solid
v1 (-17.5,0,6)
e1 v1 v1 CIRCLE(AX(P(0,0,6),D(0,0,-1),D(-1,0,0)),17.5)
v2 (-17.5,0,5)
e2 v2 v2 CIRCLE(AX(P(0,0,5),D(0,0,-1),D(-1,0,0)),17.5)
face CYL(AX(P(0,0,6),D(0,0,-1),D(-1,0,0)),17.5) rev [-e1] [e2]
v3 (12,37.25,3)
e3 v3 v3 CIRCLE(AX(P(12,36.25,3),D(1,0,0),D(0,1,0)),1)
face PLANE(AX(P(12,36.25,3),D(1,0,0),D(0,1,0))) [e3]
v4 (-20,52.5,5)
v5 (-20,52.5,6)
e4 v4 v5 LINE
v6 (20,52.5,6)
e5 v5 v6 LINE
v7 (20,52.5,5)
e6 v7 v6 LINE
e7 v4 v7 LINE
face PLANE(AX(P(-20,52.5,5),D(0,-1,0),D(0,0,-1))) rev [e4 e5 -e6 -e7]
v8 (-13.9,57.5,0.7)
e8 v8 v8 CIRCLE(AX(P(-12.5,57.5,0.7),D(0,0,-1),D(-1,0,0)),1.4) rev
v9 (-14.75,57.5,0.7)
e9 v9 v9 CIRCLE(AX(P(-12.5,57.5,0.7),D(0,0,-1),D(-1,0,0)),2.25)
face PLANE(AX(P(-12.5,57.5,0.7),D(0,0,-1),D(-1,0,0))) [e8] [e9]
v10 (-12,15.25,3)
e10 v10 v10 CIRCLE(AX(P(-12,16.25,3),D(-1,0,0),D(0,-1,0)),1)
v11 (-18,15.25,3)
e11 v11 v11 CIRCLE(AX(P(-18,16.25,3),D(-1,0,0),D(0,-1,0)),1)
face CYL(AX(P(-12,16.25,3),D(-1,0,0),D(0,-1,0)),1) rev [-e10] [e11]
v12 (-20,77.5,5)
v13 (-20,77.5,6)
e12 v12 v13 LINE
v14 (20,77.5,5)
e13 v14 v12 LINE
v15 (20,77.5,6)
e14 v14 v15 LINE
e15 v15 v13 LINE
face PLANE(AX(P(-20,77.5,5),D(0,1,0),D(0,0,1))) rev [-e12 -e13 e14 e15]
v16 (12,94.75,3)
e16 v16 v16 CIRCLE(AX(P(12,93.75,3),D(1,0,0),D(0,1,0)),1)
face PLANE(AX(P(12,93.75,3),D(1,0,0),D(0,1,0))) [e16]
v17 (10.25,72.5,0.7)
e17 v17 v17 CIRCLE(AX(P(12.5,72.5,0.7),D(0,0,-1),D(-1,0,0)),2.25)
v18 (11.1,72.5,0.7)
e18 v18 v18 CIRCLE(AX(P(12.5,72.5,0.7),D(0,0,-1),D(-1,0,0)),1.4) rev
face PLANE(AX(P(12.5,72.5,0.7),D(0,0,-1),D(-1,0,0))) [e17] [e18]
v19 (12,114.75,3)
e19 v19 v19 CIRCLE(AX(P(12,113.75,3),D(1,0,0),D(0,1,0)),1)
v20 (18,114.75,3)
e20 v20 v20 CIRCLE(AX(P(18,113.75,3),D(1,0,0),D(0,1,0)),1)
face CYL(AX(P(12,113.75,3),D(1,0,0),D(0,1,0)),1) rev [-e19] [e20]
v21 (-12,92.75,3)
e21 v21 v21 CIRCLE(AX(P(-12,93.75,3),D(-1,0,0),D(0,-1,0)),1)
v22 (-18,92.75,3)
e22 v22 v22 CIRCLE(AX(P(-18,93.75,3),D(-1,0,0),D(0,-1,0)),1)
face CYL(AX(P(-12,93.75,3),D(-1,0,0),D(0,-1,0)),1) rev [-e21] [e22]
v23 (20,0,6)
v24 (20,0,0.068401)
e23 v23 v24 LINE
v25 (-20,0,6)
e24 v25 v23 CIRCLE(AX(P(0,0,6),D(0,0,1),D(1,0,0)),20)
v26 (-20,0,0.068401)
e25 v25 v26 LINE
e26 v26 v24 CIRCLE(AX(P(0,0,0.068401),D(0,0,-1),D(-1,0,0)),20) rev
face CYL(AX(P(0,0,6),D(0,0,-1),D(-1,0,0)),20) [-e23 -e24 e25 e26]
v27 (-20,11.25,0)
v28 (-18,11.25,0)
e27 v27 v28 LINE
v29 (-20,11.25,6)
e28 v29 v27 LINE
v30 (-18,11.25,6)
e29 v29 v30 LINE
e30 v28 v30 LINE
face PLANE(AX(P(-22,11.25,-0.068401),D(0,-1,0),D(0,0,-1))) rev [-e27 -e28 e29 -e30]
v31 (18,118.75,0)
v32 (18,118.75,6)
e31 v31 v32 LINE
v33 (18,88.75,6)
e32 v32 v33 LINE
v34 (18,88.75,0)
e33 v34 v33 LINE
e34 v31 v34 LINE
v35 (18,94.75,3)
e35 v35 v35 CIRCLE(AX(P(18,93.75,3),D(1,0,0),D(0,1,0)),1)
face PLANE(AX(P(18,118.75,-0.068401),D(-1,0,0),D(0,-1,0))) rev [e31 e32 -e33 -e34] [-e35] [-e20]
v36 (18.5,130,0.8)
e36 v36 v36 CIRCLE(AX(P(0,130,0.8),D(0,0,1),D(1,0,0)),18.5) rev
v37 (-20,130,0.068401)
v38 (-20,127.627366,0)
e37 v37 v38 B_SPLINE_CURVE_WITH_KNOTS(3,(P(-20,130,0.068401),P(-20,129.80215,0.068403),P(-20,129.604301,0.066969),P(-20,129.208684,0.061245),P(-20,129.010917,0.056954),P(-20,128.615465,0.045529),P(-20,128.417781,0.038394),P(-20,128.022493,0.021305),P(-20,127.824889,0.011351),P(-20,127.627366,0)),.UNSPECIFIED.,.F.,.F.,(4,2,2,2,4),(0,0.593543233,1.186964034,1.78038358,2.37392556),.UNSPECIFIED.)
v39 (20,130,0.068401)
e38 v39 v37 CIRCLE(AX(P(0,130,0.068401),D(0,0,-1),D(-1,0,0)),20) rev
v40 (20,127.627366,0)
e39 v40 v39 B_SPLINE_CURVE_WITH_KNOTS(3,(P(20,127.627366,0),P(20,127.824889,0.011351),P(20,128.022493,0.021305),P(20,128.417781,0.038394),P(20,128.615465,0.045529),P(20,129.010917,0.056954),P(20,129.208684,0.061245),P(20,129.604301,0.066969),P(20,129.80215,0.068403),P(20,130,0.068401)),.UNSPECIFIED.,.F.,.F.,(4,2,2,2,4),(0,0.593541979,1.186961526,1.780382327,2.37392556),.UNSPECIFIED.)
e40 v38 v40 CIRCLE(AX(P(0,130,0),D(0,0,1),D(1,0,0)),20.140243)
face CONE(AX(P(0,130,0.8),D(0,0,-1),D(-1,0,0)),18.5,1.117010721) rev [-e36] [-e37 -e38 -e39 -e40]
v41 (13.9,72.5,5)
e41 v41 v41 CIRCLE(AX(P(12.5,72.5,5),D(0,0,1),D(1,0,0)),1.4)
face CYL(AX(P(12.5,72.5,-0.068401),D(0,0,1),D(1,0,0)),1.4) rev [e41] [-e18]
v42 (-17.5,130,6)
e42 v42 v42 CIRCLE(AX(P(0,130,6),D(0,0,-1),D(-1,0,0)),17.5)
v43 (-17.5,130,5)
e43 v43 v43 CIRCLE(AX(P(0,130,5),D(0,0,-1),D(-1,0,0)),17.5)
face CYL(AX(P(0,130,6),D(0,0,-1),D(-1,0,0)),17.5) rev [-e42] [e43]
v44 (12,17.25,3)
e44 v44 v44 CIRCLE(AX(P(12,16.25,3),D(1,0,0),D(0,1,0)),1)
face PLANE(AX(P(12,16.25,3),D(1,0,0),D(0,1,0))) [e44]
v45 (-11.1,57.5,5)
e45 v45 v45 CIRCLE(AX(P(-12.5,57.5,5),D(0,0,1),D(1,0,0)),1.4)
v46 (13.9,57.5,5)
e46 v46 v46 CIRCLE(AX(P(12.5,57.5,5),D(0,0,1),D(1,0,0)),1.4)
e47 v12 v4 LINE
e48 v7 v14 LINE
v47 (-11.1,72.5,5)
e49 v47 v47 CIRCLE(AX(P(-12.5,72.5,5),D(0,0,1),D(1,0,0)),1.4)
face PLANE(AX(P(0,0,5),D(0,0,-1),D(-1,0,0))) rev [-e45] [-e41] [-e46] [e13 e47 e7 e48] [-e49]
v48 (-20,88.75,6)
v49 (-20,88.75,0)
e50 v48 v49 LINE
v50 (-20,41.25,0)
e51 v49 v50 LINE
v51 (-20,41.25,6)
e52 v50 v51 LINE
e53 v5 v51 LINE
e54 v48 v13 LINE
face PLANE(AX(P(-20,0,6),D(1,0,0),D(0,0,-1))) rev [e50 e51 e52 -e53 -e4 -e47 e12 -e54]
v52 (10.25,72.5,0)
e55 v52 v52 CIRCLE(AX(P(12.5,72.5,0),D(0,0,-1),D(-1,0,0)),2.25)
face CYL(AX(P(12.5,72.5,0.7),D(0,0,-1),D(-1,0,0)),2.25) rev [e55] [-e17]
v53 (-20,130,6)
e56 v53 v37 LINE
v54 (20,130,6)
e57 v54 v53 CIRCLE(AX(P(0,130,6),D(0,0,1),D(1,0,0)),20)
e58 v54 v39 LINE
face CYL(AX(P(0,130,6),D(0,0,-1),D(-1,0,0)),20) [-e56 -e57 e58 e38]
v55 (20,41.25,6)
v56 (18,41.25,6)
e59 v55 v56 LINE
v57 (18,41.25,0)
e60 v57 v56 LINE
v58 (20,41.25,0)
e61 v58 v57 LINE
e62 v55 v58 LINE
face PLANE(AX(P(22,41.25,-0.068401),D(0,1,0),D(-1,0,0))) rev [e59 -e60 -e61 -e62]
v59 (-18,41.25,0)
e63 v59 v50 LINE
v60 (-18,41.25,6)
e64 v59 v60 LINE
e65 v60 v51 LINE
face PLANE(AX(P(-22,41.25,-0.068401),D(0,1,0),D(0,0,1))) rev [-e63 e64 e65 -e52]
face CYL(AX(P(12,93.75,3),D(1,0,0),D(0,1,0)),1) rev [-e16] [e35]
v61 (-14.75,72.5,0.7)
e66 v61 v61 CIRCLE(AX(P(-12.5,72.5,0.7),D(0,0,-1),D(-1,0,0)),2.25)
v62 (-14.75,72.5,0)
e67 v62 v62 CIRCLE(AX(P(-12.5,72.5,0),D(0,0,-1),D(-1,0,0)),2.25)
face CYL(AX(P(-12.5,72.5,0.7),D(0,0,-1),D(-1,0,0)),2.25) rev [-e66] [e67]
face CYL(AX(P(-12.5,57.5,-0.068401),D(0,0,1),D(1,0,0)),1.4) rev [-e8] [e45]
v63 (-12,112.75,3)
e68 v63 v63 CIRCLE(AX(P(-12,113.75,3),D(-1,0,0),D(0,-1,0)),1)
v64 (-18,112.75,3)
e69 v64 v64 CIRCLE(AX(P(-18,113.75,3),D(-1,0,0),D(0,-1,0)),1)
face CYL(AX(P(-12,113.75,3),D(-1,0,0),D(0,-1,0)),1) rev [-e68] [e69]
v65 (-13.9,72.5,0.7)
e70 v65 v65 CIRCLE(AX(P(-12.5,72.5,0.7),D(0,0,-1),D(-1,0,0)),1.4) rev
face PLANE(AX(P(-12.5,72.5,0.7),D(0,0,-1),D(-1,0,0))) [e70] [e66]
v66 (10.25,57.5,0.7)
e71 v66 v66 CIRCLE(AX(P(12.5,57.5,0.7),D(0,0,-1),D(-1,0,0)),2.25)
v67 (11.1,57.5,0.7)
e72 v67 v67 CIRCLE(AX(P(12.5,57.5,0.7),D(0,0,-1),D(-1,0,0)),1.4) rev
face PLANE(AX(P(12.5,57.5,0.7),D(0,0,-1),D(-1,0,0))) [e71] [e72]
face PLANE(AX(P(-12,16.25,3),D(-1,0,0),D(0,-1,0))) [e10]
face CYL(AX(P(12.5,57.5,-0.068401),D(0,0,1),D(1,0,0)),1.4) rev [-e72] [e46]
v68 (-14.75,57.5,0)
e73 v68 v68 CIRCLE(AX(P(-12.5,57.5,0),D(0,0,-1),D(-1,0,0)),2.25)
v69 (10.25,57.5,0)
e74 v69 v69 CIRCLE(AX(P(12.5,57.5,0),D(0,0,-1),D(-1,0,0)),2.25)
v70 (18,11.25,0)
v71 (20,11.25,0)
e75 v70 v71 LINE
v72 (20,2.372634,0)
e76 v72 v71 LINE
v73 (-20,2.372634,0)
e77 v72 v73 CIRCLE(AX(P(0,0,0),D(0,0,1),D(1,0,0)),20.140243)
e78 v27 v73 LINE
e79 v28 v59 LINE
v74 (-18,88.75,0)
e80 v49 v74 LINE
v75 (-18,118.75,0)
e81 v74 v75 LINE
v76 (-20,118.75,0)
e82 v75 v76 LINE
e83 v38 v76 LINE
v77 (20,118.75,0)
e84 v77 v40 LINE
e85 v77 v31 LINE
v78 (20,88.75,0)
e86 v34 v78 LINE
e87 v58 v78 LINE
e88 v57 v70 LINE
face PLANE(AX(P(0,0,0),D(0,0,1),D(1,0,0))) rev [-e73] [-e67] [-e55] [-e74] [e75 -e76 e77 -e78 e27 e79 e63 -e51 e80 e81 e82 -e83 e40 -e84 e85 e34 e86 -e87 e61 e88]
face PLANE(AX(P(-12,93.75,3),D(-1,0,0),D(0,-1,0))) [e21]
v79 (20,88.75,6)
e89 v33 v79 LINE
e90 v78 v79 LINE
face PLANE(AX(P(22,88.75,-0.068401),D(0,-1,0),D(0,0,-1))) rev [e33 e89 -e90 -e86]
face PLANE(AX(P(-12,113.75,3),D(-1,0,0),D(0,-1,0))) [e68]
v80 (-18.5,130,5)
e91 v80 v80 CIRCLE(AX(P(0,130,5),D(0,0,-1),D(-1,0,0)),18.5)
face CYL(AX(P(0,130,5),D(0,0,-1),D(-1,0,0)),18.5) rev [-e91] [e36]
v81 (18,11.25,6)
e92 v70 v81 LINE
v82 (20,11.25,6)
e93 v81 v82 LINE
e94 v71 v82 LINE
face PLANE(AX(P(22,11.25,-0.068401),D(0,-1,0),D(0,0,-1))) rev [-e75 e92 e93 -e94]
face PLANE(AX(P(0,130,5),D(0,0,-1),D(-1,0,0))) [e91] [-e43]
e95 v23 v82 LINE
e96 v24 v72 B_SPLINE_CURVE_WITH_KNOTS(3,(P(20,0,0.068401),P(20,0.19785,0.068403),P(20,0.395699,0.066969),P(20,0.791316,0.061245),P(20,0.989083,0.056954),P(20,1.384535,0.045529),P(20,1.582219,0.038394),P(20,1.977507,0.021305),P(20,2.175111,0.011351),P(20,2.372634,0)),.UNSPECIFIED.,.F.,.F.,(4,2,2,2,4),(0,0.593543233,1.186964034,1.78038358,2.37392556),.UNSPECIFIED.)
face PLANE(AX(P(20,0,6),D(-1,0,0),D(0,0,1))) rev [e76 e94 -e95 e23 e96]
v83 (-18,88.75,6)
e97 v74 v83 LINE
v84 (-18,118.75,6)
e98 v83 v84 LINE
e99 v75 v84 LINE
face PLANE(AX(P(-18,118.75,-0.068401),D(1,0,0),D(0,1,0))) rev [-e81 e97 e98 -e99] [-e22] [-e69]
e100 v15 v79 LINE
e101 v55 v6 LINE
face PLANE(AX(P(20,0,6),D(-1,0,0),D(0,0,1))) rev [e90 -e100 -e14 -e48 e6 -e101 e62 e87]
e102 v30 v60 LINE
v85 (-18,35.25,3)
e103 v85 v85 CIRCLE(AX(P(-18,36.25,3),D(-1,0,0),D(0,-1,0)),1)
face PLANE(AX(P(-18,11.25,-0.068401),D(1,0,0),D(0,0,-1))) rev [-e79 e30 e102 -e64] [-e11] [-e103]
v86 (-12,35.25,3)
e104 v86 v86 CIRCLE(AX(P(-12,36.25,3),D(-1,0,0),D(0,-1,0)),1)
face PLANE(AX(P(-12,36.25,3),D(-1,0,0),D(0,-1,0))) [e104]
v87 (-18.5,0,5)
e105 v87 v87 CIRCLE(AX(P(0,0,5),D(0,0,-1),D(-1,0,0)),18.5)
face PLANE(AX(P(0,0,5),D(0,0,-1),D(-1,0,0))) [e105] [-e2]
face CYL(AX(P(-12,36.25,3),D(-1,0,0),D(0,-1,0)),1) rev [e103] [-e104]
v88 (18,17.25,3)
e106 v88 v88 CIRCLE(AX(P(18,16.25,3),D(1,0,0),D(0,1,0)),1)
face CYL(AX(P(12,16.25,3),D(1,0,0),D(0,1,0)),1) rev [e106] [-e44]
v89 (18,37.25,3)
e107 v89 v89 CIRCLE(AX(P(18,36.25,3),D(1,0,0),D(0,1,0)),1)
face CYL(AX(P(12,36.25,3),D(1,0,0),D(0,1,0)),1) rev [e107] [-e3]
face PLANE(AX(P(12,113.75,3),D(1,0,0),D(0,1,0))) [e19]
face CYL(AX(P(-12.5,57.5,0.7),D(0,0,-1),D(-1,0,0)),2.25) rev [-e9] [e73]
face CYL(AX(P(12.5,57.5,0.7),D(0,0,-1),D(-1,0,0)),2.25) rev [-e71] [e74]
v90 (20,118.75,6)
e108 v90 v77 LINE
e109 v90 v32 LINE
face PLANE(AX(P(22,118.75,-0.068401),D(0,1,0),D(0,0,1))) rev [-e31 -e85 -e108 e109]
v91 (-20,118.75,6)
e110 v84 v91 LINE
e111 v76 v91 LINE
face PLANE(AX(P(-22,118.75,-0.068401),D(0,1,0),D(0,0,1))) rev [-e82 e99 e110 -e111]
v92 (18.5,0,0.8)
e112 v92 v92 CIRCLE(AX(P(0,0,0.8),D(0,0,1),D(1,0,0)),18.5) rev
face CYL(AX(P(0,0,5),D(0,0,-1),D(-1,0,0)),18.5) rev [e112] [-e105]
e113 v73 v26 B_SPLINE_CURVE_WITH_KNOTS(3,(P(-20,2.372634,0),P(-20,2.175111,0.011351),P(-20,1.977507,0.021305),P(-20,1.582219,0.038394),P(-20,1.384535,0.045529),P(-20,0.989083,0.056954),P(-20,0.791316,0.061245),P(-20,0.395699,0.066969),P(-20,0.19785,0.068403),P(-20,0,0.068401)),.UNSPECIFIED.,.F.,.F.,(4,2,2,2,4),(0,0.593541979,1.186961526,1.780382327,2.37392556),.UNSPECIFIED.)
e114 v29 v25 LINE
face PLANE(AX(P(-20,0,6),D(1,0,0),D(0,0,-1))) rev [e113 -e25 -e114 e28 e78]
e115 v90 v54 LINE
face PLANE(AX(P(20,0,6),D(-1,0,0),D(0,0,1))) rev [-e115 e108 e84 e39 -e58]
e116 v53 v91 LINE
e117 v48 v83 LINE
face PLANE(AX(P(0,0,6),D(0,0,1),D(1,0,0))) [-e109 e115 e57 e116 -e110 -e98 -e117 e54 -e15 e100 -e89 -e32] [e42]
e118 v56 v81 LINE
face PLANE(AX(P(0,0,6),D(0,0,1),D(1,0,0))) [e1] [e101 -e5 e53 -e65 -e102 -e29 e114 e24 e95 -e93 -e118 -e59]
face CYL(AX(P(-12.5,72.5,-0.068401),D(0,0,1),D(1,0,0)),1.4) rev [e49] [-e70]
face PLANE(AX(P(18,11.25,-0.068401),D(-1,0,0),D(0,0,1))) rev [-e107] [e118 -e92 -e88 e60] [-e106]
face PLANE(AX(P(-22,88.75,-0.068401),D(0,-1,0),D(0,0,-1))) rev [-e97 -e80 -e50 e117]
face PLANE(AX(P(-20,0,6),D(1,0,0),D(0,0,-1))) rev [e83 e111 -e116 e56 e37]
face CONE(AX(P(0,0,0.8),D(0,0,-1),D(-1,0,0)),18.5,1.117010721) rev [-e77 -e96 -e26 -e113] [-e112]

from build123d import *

# Parameters (mm, degrees)
EXTRUDE_1_DEPTH      = 6
SKETCH_2_R           = 18.5
CUT_EXTRUDE_1_DEPTH  = 5
CHAMFER_1_SIZE       = 1.640243073
CHAMFER_1_SIZE_2     = 0.8
SKETCH_18_W          = 40
SKETCH_18_H          = 25
CUT_EXTRUDE_9_DEPTH  = 1
SKETCH_19_R          = 1.4
CUT_EXTRUDE_10_DEPTH = 152.410039297
SKETCH_20_R          = 2.25
CUT_EXTRUDE_11_DEPTH = 0.7
SKETCH_21_W          = 4
SKETCH_21_H          = 30
CUT_EXTRUDE_12_DEPTH = 152.446360141
SKETCH_22_R          = 1
CUT_EXTRUDE_13_DEPTH = 6
CUT_EXTRUDE_START    = -6
SKETCH_23_R          = 1
CUT_EXTRUDE_14_DEPTH = 6
SKETCH_24_R          = 17.5
CUT_EXTRUDE_15_DEPTH = 152.410039297


with BuildPart() as part:
    # 스케치1 → 보스-돌출1 (new body)
    with BuildSketch(Plane.XY):
        with BuildLine():
            Line((-20, 0), (-20, 130))
            ThreePointArc((-20, 130), (0, 150), (20, 130))
            Line((20, 130), (20, 0))
            ThreePointArc((20, 0), (0, -20), (-20, 0))
        make_face()
    extrude(amount=EXTRUDE_1_DEPTH)

    # 스케치2 → 컷-돌출1 (cut)
    with BuildSketch(Plane(origin=(0, 0, 0), x_dir=(-1, 0, 0), z_dir=(0, 0, -1))):
        Circle(SKETCH_2_R)
        with Locations((0, 130)):
            Circle(SKETCH_2_R)
    extrude(amount=-CUT_EXTRUDE_1_DEPTH, mode=Mode.SUBTRACT)

    # 모따기1
    # the kernel refuses this chamfer: 1.640243073, 0.8 mm, written as the material it takes off along each edge
    with BuildSketch(Plane(origin=(0, 130, 0), x_dir=(-1, 0, 0), z_dir=(0, -1, 0))) as chamfer_1_piece_1:
        Polygon((18.5 + CHAMFER_1_SIZE, 0), (18.5, -CHAMFER_1_SIZE_2), (18.5, 0), align=None)
    revolve(axis=Axis((0, 130, 0), (0, 0, -1)), mode=Mode.SUBTRACT)
    with BuildSketch(Plane(origin=(0, 0, 0), x_dir=(-1, 0, 0), z_dir=(0, -1, 0))) as chamfer_1_piece_2:
        Polygon((18.5 + CHAMFER_1_SIZE, 0), (18.5, -CHAMFER_1_SIZE_2), (18.5, 0), align=None)
    revolve(axis=Axis((0, 0, 0), (0, 0, -1)), mode=Mode.SUBTRACT)

    # 스케치18 → 컷-돌출9 (cut)
    with BuildSketch(Plane.XY.offset(6)):
        with Locations((0, 65)):
            Rectangle(SKETCH_18_W, SKETCH_18_H)
    extrude(amount=-CUT_EXTRUDE_9_DEPTH, mode=Mode.SUBTRACT)

    # 스케치19 → 컷-돌출10 (cut, through all)
    with BuildSketch(Plane.XY.offset(5)):
        with Locations((-12.5, 72.5)):
            Circle(SKETCH_19_R)
        with Locations((12.5, 72.5)):
            Circle(SKETCH_19_R)
        with Locations((-12.5, 57.5)):
            Circle(SKETCH_19_R)
        with Locations((12.5, 57.5)):
            Circle(SKETCH_19_R)
    extrude(amount=-CUT_EXTRUDE_10_DEPTH, mode=Mode.SUBTRACT)

    # 스케치20 → 컷-돌출11 (cut)
    with BuildSketch(Plane(origin=(0, 0, 0), x_dir=(-1, 0, 0), z_dir=(0, 0, -1))):
        with Locations((-12.5, 72.5)):
            Circle(SKETCH_20_R)
        with Locations((12.5, 72.5)):
            Circle(SKETCH_20_R)
        with Locations((-12.5, 57.5)):
            Circle(SKETCH_20_R)
        with Locations((12.5, 57.5)):
            Circle(SKETCH_20_R)
    extrude(amount=-CUT_EXTRUDE_11_DEPTH, mode=Mode.SUBTRACT)

    # 스케치21 → 컷-돌출12 (cut, through all)
    with BuildSketch(Plane.XY.offset(6)):
        with Locations((-20, 103.75)):
            Rectangle(SKETCH_21_W, SKETCH_21_H)
        with Locations((20, 103.75)):
            Rectangle(SKETCH_21_W, SKETCH_21_H)
        with Locations((-20, 26.25)):
            Rectangle(SKETCH_21_W, SKETCH_21_H)
        with Locations((20, 26.25)):
            Rectangle(SKETCH_21_W, SKETCH_21_H)
    extrude(amount=-CUT_EXTRUDE_12_DEPTH, mode=Mode.SUBTRACT)

    # 스케치22 → 컷-돌출13 (cut)
    with BuildSketch(Plane(origin=(18, 0, 0), x_dir=(0, 0, -1), z_dir=(1, 0, 0))):
        with Locations(Location((-3, 16.25, 0), (0, 0, 90))):
            Circle(SKETCH_22_R)
        with Locations(Location((-3, 36.25, 0), (0, 0, 90))):
            Circle(SKETCH_22_R)
        with Locations(Location((-3, 113.75, 0), (0, 0, 90))):
            Circle(SKETCH_22_R)
        with Locations(Location((-3, 93.75, 0), (0, 0, 90))):
            Circle(SKETCH_22_R)
    extrude(amount=-CUT_EXTRUDE_13_DEPTH, mode=Mode.SUBTRACT)

    # 스케치23 → 컷-돌출14 (cut)
    with BuildSketch(Plane.ZY.offset(18).offset(CUT_EXTRUDE_START)):
        with Locations(Location((3, 16.25, 0), (0, 0, 90))):
            Circle(SKETCH_23_R)
        with Locations(Location((3, 36.25, 0), (0, 0, 90))):
            Circle(SKETCH_23_R)
        with Locations(Location((3, 113.75, 0), (0, 0, 90))):
            Circle(SKETCH_23_R)
        with Locations(Location((3, 93.75, 0), (0, 0, 90))):
            Circle(SKETCH_23_R)
    extrude(amount=CUT_EXTRUDE_14_DEPTH, mode=Mode.SUBTRACT)

    # 스케치24 → 컷-돌출15 (cut, through all)
    with BuildSketch(Plane(origin=(0, 0, 5), x_dir=(-1, 0, 0), z_dir=(0, 0, -1))):
        with Locations((0, 130)):
            Circle(SKETCH_24_R)
        Circle(SKETCH_24_R)
    extrude(amount=-CUT_EXTRUDE_15_DEPTH, mode=Mode.SUBTRACT)


solid = part.part
